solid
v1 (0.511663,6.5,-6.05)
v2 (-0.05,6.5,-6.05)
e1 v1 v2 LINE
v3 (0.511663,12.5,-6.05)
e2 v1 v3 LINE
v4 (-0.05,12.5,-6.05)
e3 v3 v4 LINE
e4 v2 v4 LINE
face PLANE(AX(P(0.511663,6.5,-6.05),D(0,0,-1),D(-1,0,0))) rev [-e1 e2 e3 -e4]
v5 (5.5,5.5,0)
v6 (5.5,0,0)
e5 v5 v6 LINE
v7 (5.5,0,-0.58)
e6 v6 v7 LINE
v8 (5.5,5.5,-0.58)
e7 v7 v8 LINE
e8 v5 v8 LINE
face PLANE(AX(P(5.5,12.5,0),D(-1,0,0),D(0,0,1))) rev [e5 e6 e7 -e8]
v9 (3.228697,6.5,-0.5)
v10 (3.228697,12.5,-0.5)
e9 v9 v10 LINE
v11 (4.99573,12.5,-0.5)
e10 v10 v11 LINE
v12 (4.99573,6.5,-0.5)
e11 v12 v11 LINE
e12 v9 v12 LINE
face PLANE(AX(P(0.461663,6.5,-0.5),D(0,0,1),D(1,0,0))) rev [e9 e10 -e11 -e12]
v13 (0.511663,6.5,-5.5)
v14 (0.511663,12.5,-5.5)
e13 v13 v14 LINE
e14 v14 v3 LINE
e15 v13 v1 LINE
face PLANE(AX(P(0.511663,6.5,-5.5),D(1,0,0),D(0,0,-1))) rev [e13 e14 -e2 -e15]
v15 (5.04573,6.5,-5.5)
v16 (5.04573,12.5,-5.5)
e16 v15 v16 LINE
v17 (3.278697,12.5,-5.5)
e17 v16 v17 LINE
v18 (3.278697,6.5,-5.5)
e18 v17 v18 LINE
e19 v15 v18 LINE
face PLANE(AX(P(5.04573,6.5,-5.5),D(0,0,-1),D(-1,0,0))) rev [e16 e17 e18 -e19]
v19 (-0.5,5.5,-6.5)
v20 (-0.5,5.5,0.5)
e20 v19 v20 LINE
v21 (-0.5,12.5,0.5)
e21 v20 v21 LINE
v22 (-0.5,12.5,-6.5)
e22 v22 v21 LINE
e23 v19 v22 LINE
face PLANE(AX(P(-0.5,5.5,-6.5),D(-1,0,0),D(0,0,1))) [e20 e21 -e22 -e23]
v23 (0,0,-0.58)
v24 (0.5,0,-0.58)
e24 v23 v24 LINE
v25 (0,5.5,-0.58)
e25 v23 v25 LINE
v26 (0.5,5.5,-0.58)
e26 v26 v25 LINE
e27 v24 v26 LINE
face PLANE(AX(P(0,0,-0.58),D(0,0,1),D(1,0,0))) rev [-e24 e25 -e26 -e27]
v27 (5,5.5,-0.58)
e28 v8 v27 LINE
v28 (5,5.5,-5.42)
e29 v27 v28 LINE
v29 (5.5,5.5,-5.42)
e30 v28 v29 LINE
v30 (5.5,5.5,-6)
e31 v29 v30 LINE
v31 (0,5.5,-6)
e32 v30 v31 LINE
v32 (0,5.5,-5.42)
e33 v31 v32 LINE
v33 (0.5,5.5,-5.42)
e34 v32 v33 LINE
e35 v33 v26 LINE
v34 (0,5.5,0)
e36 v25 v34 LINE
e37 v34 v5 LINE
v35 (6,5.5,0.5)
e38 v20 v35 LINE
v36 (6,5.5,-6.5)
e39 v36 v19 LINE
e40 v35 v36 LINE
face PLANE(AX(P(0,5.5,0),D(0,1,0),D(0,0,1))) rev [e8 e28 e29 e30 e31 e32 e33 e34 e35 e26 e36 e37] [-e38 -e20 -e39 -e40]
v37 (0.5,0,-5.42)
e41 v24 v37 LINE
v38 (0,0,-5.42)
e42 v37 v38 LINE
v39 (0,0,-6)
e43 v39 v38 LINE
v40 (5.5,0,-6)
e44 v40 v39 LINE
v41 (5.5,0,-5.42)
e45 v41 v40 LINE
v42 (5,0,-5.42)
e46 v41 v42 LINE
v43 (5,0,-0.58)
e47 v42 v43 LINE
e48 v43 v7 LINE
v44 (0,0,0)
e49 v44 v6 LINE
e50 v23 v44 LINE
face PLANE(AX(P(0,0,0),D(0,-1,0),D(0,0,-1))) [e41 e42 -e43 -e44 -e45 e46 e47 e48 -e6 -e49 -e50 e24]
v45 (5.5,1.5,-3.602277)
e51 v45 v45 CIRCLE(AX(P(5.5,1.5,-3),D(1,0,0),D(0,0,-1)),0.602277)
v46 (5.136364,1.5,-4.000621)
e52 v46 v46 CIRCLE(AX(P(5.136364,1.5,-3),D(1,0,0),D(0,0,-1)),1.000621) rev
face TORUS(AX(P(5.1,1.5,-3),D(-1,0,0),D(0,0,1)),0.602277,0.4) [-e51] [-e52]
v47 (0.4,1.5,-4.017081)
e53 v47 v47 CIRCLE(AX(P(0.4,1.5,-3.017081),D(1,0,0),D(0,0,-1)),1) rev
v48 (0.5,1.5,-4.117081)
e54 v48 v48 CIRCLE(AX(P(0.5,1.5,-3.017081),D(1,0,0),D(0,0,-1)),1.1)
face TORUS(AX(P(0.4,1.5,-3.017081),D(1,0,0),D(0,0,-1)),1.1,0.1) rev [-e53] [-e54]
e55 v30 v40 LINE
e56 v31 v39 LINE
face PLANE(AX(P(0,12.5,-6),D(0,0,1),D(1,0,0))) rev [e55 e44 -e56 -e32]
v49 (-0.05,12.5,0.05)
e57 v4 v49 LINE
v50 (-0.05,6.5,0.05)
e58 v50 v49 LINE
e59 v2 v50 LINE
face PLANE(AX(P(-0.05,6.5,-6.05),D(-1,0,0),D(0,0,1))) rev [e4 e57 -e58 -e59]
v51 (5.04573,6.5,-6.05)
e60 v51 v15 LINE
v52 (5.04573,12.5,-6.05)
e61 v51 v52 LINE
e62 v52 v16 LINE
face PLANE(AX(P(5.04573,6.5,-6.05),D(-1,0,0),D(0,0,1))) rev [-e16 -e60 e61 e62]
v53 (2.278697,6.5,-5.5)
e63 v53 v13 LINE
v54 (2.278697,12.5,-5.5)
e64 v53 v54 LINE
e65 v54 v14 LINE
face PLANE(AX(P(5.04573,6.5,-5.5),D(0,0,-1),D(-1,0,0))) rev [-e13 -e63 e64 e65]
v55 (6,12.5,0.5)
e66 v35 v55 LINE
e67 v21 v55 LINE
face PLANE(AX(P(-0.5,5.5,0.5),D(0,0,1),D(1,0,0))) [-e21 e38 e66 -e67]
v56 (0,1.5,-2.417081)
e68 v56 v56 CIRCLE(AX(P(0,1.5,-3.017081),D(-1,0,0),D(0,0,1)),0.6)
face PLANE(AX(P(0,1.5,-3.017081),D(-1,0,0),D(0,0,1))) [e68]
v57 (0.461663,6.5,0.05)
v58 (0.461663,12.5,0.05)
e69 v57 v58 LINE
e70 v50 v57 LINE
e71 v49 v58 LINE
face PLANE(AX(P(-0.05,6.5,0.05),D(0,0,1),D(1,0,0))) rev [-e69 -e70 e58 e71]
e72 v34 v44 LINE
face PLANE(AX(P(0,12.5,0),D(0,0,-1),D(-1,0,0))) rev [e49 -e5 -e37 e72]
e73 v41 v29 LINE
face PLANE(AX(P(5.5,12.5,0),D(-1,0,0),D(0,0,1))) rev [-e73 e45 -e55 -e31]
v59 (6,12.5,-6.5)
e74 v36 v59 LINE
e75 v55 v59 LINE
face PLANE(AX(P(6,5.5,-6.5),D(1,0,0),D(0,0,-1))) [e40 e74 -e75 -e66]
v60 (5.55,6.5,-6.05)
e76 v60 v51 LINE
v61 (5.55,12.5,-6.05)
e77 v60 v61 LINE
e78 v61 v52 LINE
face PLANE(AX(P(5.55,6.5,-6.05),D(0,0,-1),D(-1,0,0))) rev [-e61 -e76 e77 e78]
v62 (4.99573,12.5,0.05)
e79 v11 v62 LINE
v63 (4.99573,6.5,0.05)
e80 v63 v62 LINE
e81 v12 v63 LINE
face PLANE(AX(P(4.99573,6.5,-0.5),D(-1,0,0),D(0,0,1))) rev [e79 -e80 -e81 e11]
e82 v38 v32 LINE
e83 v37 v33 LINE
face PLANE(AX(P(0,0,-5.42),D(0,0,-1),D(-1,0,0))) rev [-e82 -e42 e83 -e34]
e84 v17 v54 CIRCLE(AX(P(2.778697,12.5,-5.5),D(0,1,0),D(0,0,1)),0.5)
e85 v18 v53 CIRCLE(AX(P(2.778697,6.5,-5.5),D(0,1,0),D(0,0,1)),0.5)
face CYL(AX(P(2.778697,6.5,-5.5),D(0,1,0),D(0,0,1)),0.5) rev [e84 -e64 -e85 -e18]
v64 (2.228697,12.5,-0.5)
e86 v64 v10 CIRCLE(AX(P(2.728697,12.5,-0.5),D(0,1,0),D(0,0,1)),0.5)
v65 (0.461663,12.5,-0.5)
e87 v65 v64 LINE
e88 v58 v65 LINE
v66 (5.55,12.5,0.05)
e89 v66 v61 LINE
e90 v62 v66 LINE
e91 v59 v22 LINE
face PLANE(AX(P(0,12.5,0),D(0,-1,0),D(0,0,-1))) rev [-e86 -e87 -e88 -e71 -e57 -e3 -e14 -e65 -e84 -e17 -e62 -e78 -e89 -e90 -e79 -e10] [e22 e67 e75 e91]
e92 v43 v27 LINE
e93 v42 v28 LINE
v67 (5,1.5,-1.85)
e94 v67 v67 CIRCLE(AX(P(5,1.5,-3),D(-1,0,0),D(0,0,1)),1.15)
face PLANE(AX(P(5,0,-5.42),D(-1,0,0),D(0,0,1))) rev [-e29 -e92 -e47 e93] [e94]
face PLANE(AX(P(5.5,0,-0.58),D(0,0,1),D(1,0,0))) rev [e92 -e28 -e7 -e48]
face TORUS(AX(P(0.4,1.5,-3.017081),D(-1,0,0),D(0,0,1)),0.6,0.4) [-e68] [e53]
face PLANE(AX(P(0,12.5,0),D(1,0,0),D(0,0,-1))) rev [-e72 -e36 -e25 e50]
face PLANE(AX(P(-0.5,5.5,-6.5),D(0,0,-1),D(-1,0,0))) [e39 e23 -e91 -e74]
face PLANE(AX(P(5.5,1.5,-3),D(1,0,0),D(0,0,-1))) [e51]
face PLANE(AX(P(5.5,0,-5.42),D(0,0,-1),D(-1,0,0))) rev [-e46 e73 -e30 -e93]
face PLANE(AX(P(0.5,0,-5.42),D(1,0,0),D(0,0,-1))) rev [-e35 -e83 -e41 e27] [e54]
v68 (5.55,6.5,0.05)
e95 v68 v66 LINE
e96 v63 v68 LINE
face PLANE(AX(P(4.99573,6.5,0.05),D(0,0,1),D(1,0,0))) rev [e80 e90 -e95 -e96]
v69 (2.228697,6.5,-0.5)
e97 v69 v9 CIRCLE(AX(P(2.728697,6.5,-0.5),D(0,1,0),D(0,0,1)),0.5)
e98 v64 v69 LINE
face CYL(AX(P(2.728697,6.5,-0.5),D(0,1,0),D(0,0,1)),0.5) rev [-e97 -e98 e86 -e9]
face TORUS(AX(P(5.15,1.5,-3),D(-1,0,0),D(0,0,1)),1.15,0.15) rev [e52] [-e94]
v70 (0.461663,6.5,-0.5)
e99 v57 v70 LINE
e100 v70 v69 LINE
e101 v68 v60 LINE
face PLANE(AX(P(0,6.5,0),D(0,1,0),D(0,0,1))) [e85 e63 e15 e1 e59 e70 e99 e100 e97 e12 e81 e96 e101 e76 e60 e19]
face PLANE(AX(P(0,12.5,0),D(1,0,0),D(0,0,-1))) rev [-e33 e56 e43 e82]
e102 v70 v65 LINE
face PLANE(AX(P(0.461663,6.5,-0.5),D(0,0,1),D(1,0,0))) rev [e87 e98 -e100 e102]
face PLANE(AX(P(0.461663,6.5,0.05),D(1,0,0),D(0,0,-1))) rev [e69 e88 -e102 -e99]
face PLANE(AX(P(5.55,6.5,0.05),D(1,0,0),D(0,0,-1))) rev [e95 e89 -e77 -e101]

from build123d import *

# Parameters (mm, degrees)
SKETCH1_W           = 5.5
SKETCH1_H           = 6
BOSS_EXTRUDE1_DEPTH = 12.5
SKETCH2_W           = 0.5
SKETCH2_H           = 4.84
CUT_EXTRUDE1_DEPTH  = 12.5
SKETCH3_R           = 1
BOSS_EXTRUDE2_DEPTH = 0.5
FILLET1_R           = 0.15
FILLET2_R           = 0.4
SKETCH4_R           = 1
BOSS_EXTRUDE3_DEPTH = 0.5
FILLET3_R           = 0.1
FILLET4_R           = 0.4
SKETCH5_W           = 6.5
SKETCH5_H           = 7
BOSS_EXTRUDE5_DEPTH = 7
CUT_EXTRUDE4_DEPTH  = 6
SKETCH8_R           = 0.5
CUT_EXTRUDE5_DEPTH  = 6


with BuildPart() as part:
    # Sketch1 → Boss-Extrude1 (new body)
    with BuildSketch(Plane(origin=(0, 0, 0), x_dir=(1, 0, 0), z_dir=(0, 1, 0))):
        with Locations((2.75, 3)):
            Rectangle(SKETCH1_W, SKETCH1_H)
    extrude(amount=BOSS_EXTRUDE1_DEPTH)

    # Sketch2 → Cut-Extrude1 (cut)
    with BuildSketch(Plane(origin=(0, 12.5, 0), x_dir=(1, 0, 0), z_dir=(0, 1, 0))):
        with Locations((0.25, 3)):
            Rectangle(SKETCH2_W, SKETCH2_H)
        with Locations((5.25, 3)):
            Rectangle(SKETCH2_W, SKETCH2_H)
    extrude(amount=-CUT_EXTRUDE1_DEPTH, mode=Mode.SUBTRACT)

    # Sketch3 → Boss-Extrude2 (add)
    with BuildSketch(Plane(origin=(5, 0, 0), x_dir=(0, 0, -1), z_dir=(1, 0, 0))):
        with Locations(Location((3, 1.5, 0), (0, 0, 180))):
            Circle(SKETCH3_R)
    extrude(amount=BOSS_EXTRUDE2_DEPTH)

    # Fillet1
    fillet1_edges = [part.edges().sort_by_distance(p)[0] for p in [
        (5, 1.5, -4),
    ]]
    fillet(fillet1_edges, radius=FILLET1_R)

    # Fillet2
    fillet2_edges = [part.edges().sort_by_distance(p)[0] for p in [
        (5.5, 1.5, -4),
    ]]
    fillet(fillet2_edges, radius=FILLET2_R)

    # Sketch4 → Boss-Extrude3 (add)
    with BuildSketch(Plane.ZY.offset(-0.5)):
        with Locations(Location((-3.017081324, 1.5, 0), (0, 0, 180))):
            Circle(SKETCH4_R)
    extrude(amount=BOSS_EXTRUDE3_DEPTH)

    # Fillet3
    fillet3_edges = [part.edges().sort_by_distance(p)[0] for p in [
        (0.5, 1.5, -2.017081324),
    ]]
    fillet(fillet3_edges, radius=FILLET3_R)

    # Fillet4
    fillet4_edges = [part.edges().sort_by_distance(p)[0] for p in [
        (0, 1.5, -2.017081324),
    ]]
    fillet(fillet4_edges, radius=FILLET4_R - 0.0001)  # a hair under: the kernel refuses the full size

    # Sketch5 → Boss-Extrude5 (add)
    with BuildSketch(Plane(origin=(0, 12.5, 0), x_dir=(1, 0, 0), z_dir=(0, 1, 0))):
        with Locations((2.75, 3)):
            Rectangle(SKETCH5_W, SKETCH5_H)
    extrude(amount=-BOSS_EXTRUDE5_DEPTH)

    # Sketch7 → Cut-Extrude4 (cut)
    with BuildSketch(Plane(origin=(0, 12.5, 0), x_dir=(1, 0, 0), z_dir=(0, 1, 0))):
        Polygon((-0.05, -0.05), (0.461663349, -0.05), (0.461663349, 0.5), (4.995729898, 0.5), (4.995729898, -0.05), (5.55, -0.05), (5.55, 6.05), (5.045729898, 6.05), (5.045729898, 5.5), (0.511663349, 5.5), (0.511663349, 6.05), (-0.05, 6.05), align=None)
    extrude(amount=-CUT_EXTRUDE4_DEPTH, mode=Mode.SUBTRACT)

    # Sketch8 → Cut-Extrude5 (cut)
    with BuildSketch(Plane(origin=(0, 12.5, 0), x_dir=(1, 0, 0), z_dir=(0, 1, 0))):
        with Locations((2.778696624, 5.5)):
            Circle(SKETCH8_R)
        with Locations((2.728696624, 0.5)):
            Circle(SKETCH8_R)
    extrude(amount=-CUT_EXTRUDE5_DEPTH, mode=Mode.SUBTRACT)


solid = part.part
